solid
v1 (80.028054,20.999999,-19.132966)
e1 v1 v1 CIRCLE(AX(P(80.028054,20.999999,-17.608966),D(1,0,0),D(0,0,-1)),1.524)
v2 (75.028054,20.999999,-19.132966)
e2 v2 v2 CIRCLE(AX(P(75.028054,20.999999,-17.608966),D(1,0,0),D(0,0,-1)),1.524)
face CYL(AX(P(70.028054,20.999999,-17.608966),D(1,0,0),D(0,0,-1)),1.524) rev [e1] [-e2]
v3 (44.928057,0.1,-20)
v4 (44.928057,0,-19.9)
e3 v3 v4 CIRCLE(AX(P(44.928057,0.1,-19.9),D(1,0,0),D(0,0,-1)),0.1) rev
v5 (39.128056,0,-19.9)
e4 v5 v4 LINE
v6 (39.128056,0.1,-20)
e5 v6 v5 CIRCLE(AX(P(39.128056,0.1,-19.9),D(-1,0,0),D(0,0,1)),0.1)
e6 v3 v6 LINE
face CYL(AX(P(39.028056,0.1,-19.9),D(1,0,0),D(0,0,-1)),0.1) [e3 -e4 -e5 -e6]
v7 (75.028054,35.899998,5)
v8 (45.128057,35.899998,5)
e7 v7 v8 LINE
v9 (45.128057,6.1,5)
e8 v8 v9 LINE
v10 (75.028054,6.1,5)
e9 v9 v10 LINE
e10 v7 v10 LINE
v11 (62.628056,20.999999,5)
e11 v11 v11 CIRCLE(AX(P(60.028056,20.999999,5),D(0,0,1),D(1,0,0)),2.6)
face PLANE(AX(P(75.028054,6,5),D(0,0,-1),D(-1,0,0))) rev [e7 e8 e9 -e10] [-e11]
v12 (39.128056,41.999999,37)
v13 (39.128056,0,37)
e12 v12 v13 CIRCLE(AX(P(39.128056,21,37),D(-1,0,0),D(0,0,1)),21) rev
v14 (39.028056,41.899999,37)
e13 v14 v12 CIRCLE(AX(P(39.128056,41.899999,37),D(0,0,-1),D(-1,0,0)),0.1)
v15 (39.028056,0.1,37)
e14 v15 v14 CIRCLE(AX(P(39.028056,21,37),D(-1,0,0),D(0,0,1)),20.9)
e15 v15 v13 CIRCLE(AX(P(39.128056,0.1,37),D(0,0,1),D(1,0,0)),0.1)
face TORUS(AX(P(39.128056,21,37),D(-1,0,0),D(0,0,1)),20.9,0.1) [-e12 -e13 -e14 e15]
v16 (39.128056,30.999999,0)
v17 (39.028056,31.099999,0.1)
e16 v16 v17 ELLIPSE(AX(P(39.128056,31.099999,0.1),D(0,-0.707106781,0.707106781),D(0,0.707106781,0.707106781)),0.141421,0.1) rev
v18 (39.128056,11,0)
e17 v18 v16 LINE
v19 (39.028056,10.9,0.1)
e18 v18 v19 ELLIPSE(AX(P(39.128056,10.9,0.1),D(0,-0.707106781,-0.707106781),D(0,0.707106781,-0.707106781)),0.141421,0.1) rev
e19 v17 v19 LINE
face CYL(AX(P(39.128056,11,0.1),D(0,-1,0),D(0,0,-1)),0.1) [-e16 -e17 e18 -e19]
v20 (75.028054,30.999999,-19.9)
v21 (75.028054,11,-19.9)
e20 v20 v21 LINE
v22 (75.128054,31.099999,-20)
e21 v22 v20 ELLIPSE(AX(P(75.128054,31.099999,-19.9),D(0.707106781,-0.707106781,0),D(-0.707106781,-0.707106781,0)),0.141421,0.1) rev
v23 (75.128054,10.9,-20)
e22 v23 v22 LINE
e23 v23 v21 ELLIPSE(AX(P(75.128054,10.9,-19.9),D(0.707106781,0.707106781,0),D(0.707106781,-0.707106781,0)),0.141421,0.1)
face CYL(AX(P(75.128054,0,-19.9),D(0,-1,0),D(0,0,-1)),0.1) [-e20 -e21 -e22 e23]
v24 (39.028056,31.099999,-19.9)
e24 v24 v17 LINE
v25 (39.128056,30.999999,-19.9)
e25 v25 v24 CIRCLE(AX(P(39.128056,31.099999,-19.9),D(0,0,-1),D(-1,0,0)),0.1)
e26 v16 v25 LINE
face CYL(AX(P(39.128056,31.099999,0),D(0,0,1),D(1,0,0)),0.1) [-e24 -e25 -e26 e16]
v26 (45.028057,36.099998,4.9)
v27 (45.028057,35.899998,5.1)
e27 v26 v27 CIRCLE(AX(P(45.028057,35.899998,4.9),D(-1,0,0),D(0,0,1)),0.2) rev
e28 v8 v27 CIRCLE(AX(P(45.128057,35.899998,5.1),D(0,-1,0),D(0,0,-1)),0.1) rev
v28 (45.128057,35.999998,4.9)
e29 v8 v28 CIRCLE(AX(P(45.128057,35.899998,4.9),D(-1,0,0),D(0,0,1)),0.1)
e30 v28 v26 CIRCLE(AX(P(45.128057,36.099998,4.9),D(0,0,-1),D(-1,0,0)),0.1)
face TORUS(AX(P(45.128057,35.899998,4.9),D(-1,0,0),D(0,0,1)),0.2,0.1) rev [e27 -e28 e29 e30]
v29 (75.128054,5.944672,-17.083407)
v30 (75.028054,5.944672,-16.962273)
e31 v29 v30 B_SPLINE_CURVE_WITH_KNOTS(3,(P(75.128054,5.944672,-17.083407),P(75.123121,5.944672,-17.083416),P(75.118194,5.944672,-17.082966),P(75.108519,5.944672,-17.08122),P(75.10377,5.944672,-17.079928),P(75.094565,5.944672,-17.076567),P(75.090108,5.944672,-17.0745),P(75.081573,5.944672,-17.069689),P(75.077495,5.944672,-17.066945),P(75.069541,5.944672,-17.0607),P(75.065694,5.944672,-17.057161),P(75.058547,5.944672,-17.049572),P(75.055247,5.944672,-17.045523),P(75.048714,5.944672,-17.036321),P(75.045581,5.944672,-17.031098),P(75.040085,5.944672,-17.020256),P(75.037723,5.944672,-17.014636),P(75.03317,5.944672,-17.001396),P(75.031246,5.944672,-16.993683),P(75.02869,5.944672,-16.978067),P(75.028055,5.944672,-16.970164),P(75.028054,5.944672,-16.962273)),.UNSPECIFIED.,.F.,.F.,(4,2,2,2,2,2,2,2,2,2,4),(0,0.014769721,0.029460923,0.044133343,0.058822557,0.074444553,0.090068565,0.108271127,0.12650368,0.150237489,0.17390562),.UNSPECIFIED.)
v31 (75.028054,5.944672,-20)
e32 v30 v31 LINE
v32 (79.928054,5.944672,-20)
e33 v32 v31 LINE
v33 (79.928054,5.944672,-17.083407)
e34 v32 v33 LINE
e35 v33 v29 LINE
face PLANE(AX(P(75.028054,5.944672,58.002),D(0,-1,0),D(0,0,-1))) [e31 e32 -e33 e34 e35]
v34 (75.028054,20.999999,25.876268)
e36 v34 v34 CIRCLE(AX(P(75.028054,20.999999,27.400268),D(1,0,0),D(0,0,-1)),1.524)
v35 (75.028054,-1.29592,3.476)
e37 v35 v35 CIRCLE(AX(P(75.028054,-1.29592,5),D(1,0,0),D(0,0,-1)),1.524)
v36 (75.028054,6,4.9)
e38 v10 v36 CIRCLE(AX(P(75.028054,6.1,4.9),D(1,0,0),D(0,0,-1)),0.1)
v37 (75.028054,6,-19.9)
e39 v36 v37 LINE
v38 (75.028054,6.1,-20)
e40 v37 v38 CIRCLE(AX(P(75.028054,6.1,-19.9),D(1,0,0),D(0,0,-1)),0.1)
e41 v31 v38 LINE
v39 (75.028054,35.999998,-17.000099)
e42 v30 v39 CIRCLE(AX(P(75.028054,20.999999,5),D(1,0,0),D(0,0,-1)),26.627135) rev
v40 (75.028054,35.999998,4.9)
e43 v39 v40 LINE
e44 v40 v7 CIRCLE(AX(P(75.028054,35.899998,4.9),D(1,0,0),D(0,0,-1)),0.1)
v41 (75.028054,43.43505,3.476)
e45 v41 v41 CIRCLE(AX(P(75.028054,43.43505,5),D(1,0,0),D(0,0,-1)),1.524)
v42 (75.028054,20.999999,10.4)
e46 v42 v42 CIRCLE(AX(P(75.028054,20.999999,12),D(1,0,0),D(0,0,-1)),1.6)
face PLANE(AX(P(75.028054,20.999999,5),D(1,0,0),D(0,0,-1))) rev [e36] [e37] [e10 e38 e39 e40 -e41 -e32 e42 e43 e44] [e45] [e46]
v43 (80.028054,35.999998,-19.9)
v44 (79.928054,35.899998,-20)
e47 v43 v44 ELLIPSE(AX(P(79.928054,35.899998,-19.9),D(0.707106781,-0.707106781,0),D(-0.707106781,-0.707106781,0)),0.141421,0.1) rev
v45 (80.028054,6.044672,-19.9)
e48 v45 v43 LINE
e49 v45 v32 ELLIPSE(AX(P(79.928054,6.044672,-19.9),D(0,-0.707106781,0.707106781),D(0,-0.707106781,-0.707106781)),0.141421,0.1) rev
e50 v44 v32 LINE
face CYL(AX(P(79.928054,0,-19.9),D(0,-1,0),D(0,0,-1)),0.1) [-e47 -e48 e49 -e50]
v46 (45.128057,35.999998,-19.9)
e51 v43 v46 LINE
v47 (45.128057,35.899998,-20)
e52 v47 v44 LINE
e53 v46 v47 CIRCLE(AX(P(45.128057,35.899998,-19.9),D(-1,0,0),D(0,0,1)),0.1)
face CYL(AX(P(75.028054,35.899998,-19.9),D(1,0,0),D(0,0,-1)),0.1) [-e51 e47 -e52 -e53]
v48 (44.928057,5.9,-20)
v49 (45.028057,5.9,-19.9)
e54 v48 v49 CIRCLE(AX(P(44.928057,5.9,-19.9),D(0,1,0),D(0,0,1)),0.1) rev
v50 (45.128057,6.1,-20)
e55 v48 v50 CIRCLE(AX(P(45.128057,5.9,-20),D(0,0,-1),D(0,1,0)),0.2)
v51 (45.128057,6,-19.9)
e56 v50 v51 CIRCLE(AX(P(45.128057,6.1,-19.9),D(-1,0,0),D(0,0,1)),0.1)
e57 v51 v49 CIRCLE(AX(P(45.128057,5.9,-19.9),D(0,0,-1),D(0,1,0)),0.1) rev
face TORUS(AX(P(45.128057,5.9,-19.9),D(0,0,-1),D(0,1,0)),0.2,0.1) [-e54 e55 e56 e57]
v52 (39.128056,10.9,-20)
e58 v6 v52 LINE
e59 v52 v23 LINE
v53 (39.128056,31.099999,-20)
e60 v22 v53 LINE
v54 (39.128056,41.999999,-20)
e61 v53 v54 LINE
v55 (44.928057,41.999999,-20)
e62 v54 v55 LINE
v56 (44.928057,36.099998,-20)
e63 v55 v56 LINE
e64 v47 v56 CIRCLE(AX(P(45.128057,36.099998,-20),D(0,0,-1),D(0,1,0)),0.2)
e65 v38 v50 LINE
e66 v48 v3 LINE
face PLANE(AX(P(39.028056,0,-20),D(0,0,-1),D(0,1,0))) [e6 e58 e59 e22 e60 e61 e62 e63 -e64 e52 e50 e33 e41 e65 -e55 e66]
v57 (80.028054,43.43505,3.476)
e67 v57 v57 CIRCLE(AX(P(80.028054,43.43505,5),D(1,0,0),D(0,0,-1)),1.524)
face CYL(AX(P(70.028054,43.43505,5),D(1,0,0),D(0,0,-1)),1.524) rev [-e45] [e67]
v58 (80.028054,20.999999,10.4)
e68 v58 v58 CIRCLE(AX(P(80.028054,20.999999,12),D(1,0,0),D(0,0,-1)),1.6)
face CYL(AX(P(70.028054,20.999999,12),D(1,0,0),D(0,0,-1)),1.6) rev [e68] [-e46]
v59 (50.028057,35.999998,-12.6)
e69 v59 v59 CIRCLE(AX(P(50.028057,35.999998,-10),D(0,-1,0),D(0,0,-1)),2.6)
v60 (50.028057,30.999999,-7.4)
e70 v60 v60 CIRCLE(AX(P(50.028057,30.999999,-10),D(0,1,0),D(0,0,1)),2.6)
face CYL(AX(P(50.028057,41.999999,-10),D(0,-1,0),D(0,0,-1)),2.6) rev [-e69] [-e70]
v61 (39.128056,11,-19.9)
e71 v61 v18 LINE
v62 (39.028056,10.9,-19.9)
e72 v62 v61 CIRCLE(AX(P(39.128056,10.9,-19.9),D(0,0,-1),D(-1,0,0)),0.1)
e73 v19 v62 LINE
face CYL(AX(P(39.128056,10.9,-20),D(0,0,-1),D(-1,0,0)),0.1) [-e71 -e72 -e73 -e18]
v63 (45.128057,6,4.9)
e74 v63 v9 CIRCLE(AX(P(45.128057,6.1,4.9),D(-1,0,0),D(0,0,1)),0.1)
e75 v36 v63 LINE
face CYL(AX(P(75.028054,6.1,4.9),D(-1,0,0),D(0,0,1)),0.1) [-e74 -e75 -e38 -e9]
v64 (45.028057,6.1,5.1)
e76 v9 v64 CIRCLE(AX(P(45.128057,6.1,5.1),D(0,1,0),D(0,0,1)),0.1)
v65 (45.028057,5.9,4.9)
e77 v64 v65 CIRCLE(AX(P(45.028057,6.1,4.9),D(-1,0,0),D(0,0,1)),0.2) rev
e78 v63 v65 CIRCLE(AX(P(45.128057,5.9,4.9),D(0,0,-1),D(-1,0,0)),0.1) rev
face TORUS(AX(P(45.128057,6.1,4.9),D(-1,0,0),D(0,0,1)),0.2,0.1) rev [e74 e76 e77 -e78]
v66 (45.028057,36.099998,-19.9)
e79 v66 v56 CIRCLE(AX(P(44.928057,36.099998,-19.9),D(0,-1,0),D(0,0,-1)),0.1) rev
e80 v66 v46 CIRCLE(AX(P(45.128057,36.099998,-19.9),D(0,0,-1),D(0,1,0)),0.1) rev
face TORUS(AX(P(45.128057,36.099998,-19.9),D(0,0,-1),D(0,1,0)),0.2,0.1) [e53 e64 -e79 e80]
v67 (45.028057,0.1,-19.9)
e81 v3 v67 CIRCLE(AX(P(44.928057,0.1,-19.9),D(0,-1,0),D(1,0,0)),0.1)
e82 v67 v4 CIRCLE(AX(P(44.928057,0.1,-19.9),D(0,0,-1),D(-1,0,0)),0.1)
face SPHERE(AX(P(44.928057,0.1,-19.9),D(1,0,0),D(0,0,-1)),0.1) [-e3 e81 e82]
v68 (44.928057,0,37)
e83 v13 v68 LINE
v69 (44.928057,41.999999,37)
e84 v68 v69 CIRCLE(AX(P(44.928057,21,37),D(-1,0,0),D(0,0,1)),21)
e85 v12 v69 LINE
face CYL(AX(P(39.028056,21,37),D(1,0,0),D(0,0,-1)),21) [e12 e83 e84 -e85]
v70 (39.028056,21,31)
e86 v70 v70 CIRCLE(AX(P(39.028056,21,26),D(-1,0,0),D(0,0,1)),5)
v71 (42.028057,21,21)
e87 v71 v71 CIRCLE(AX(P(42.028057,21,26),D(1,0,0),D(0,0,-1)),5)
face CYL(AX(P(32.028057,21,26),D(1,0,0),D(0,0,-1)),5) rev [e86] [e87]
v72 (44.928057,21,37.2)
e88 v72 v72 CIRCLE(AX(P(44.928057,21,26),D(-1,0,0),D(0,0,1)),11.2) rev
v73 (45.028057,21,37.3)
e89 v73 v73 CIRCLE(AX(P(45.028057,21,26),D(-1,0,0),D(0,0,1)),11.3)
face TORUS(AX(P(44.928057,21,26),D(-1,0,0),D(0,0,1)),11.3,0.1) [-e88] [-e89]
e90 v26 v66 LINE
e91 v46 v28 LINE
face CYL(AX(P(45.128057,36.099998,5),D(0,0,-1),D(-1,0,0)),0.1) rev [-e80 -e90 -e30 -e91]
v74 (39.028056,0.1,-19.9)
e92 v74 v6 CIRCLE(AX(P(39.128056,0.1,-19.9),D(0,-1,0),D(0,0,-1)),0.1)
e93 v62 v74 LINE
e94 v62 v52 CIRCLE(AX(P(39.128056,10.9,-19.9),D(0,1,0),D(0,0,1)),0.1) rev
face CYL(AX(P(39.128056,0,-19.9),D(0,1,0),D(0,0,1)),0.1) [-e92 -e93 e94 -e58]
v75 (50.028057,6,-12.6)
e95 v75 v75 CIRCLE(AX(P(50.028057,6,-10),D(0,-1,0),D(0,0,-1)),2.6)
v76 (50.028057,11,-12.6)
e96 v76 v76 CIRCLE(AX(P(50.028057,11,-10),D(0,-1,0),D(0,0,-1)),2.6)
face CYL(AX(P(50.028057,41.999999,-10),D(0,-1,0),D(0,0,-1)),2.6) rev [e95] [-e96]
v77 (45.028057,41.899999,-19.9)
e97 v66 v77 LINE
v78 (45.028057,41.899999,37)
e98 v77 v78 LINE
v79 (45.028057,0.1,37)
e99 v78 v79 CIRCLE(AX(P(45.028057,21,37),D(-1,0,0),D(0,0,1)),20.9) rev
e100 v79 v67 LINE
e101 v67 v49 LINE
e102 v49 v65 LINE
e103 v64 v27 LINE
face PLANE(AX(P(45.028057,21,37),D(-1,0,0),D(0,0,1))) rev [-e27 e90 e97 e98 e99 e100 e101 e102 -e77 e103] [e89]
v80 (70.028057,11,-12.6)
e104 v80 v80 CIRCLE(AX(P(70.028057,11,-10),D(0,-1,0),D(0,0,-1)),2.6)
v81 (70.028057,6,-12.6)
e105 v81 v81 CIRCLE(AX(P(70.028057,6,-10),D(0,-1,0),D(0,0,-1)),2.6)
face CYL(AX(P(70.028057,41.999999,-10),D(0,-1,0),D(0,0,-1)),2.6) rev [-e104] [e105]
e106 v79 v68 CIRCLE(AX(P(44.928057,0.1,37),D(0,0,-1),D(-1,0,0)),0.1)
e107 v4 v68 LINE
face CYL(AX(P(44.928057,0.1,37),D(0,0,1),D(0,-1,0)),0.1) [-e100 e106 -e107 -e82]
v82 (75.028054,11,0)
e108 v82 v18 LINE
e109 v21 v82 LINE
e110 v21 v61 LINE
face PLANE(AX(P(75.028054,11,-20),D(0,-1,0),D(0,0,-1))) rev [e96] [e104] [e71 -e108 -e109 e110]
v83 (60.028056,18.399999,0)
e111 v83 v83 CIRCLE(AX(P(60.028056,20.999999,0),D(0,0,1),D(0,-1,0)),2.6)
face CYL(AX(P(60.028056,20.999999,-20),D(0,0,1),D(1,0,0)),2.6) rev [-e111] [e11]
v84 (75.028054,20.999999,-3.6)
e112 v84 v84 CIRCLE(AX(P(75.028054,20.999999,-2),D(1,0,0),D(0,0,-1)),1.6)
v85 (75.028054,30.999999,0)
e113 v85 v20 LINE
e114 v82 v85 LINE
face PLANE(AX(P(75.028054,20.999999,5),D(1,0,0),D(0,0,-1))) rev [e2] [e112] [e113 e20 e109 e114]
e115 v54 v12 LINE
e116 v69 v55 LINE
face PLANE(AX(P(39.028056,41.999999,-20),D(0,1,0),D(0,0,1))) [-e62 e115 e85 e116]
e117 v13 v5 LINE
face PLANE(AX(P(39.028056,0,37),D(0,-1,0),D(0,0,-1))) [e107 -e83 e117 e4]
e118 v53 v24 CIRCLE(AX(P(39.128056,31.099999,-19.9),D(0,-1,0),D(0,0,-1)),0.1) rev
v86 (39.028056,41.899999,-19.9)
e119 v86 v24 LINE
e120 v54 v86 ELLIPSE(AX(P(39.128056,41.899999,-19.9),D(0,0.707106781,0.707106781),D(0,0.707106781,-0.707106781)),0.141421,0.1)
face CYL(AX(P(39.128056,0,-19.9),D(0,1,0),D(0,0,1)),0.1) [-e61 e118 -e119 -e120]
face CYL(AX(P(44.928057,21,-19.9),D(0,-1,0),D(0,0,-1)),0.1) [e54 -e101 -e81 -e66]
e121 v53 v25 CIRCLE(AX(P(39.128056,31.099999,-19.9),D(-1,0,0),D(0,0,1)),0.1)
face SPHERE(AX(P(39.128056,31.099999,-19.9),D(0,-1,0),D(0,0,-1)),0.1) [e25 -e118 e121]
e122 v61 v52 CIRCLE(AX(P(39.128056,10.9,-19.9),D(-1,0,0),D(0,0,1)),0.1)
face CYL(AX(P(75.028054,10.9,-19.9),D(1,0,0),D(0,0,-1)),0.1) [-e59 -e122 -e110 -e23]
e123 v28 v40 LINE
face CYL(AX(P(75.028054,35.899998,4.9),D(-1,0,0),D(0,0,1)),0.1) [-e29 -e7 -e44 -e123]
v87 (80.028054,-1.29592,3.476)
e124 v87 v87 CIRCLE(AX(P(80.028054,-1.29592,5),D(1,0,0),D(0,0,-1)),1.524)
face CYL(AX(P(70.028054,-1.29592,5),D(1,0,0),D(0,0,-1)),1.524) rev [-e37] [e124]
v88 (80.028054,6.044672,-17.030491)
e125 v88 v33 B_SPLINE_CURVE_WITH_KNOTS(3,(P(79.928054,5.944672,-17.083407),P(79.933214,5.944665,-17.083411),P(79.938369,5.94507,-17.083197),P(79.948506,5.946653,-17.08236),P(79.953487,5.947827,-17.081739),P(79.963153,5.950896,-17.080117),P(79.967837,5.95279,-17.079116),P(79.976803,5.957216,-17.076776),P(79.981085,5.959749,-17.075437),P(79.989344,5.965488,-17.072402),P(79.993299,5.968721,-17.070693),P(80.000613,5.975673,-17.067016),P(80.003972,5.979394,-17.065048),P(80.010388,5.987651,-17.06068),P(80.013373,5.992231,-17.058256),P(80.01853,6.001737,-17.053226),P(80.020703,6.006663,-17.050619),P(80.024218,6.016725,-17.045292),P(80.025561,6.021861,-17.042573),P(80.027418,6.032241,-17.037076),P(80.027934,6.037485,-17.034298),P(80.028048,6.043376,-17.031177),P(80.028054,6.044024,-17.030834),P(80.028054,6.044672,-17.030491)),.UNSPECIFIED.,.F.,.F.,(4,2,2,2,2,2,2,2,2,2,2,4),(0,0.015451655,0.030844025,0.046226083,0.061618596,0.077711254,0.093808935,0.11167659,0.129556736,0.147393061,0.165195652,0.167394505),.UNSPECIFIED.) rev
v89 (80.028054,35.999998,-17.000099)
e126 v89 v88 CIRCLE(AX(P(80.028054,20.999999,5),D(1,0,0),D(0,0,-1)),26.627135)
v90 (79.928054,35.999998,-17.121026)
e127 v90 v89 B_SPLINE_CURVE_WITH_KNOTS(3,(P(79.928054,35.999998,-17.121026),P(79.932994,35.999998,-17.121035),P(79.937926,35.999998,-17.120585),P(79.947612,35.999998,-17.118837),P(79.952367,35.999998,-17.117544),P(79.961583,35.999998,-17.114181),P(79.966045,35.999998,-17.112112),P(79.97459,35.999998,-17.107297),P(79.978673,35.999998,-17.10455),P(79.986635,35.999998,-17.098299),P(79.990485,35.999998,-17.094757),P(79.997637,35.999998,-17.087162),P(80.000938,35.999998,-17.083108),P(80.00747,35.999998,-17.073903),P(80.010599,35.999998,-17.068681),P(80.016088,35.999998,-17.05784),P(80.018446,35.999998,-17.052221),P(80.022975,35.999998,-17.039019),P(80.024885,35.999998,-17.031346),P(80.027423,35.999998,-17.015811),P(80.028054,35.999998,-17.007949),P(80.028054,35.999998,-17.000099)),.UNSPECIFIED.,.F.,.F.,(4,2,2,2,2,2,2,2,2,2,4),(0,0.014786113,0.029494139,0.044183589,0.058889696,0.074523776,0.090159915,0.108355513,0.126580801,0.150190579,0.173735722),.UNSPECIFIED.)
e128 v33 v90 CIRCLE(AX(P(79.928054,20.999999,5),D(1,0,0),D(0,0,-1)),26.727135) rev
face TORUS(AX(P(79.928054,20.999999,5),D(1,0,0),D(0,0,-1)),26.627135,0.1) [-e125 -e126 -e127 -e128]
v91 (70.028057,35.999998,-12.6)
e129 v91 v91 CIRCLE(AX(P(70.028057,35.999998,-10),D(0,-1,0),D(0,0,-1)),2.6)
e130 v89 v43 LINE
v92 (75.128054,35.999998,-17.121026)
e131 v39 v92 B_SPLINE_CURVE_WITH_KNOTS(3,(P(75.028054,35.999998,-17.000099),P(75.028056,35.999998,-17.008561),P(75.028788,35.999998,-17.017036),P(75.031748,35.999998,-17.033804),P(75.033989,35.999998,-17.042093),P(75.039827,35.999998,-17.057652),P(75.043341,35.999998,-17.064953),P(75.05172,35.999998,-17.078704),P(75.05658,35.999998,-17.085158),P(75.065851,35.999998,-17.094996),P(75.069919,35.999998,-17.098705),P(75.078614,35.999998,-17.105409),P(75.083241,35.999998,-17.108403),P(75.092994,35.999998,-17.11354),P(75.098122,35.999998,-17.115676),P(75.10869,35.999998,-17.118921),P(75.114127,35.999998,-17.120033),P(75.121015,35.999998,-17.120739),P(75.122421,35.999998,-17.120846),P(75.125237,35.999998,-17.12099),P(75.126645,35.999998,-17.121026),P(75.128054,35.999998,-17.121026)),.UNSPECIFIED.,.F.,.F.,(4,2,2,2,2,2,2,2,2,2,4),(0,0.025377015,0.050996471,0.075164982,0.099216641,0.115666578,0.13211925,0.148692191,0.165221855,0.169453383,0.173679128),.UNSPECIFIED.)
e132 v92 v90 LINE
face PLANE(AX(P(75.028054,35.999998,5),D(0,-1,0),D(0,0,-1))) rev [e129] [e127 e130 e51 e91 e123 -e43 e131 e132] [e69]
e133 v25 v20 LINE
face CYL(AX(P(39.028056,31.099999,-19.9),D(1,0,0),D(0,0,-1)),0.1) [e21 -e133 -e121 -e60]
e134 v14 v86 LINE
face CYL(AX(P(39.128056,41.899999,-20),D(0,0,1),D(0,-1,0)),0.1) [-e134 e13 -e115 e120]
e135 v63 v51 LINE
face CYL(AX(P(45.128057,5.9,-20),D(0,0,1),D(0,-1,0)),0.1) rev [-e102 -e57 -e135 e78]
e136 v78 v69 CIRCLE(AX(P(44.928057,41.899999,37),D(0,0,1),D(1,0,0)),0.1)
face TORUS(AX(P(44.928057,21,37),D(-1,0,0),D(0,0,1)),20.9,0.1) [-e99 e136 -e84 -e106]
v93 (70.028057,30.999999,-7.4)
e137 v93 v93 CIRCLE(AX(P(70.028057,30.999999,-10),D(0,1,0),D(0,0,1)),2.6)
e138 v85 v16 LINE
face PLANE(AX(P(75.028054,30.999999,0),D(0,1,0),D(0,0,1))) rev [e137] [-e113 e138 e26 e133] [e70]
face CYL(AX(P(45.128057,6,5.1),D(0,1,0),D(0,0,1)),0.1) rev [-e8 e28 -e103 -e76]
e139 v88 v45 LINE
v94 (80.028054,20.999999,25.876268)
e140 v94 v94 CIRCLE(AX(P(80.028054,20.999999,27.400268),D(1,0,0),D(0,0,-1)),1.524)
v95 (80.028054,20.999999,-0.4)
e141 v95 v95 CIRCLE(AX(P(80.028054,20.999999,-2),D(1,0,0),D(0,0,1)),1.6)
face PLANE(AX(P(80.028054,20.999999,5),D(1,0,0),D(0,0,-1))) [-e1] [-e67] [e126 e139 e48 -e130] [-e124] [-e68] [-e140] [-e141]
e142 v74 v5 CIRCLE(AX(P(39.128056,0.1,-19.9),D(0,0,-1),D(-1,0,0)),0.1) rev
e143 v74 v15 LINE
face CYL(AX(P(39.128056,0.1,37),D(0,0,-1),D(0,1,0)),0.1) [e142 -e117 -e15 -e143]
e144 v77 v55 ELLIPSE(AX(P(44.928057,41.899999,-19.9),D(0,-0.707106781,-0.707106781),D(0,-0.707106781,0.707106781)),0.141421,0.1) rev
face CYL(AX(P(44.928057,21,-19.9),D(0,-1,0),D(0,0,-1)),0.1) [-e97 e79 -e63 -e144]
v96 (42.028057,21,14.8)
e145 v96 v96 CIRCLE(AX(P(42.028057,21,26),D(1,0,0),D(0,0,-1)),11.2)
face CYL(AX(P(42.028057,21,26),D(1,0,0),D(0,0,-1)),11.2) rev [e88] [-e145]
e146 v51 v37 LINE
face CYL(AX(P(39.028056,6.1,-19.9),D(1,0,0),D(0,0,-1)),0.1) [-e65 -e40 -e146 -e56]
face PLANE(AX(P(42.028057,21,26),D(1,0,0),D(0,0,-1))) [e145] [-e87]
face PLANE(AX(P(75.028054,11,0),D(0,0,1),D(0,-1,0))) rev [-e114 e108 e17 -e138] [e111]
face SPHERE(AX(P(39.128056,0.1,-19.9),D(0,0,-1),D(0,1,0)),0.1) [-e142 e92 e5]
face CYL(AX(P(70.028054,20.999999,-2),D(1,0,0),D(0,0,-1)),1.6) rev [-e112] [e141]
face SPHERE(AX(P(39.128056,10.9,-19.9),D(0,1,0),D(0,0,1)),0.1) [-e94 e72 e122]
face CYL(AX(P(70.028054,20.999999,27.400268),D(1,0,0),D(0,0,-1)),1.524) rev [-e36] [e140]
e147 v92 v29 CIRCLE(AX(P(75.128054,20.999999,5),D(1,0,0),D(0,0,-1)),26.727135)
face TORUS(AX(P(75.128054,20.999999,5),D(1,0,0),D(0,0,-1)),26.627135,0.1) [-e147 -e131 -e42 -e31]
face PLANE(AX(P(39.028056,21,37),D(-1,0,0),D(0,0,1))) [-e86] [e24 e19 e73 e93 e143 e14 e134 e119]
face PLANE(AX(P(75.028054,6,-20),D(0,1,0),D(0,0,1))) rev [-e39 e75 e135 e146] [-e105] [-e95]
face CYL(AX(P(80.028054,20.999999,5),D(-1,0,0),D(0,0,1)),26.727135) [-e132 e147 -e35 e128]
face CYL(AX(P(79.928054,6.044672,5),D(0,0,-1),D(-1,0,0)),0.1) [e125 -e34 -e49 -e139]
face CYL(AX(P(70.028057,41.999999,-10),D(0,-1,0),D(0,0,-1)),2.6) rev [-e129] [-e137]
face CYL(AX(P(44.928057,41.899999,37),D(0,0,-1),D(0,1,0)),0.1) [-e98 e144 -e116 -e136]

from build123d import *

# Parameters (mm, degrees)
BOSS_EXTRUDE1_DEPTH = 6.000000983
SKETCH2_W           = 24.999999441
SKETCH2_H           = 29.999998398
BOSS_EXTRUDE2_DEPTH = 29.999997467
SKETCH3_W           = 19.999999553
SKETCH3_H           = 19.999999553
CUT_EXTRUDE1_DEPTH  = 81.149858764
SKETCH14_R          = 11.2
CUT_EXTRUDE12_DEPTH = 3
SKETCH15_R          = 2.6
CUT_EXTRUDE13_DEPTH = 102.435737903
SKETCH19_R          = 2.6
CUT_EXTRUDE15_DEPTH = 102.00598463
SKETCH22_R          = 5
CUT_EXTRUDE16_DEPTH = 10
SKETCH23_R          = 26.727135434
BOSS_EXTRUDE3_DEPTH = 5
CUT_EXTRUDE17_DEPTH = 10
SKETCH25_R          = 1.6
CUT_EXTRUDE18_DEPTH = 10
BOSS_EXTRUDE4_START = -2.916592192
BOSS_EXTRUDE4_DEPTH = 2.916592192
SKETCH27_W          = 3.882504998
SKETCH27_H          = 30.149410972
CUT_EXTRUDE19_DEPTH = 5
FILLET4_R           = 0.1


with BuildPart() as part:
    # Sketch1 → Boss-Extrude1 (new body)
    with BuildSketch(Plane(origin=(45.028056949, 0, 0), x_dir=(0, 0, -1), z_dir=(1, 0, 0))):
        with BuildLine():
            Line((-37.000000447, 0), (19.999999553, 0))
            Line((19.999999553, 0), (19.999999553, 41.999999434))
            Line((19.999999553, 41.999999434), (-37.000000447, 41.999999434))
            ThreePointArc((-37.000000447, 41.999999434), (-58.000000164, 20.999999717), (-37.000000447, 0))
        make_face()
    extrude(amount=-BOSS_EXTRUDE1_DEPTH)

    # Sketch2 → Boss-Extrude2 (add)
    with BuildSketch(Plane(origin=(45.028056949, 0, 0), x_dir=(0, 0, -1), z_dir=(1, 0, 0))):
        with Locations((7.499999833, 20.999999251)):
            Rectangle(SKETCH2_W, SKETCH2_H)
    extrude(amount=BOSS_EXTRUDE2_DEPTH)

    # Sketch3 → Cut-Extrude1 (cut, through all)
    with BuildSketch(Plane.ZY.offset(-39.028055966)):
        with Locations((-9.999999777, 20.999999716)):
            Rectangle(SKETCH3_W, SKETCH3_H)
    extrude(amount=-CUT_EXTRUDE1_DEPTH, mode=Mode.SUBTRACT)

    # Sketch14 → Cut-Extrude12 (cut)
    with BuildSketch(Plane(origin=(45.028056949, 0, 0), x_dir=(0, 0, -1), z_dir=(1, 0, 0))):
        with Locations((-25.999999888, 20.999999717)):
            Circle(SKETCH14_R)
    extrude(amount=-CUT_EXTRUDE12_DEPTH, mode=Mode.SUBTRACT)

    # Sketch15 → Cut-Extrude13 (cut, through all)
    with BuildSketch(Plane(origin=(0, 6.000000052, 0), x_dir=(-1, 0, 0), z_dir=(0, -1, 0))):
        with Locations(Location((-50.028056949, 9.999999553, 0), (0, 0, 90))):
            Circle(SKETCH15_R)
        with Locations(Location((-70.028056949, 9.999999553, 0), (0, 0, 90))):
            Circle(SKETCH15_R)
    extrude(amount=-CUT_EXTRUDE13_DEPTH, mode=Mode.SUBTRACT)

    # Sketch19 → Cut-Extrude15 (cut, through all)
    with BuildSketch(Plane.XY.offset(4.999999888)):
        with Locations((60.028055683, 20.999999251)):
            Circle(SKETCH19_R)
    extrude(amount=-CUT_EXTRUDE15_DEPTH, mode=Mode.SUBTRACT)

    # Sketch22 → Cut-Extrude16 (cut)
    with BuildSketch(Plane(origin=(42.028056949, 0, 0), x_dir=(0, 0, -1), z_dir=(1, 0, 0))):
        with Locations((-25.999999888, 20.999999717)):
            Circle(SKETCH22_R)
    extrude(amount=-CUT_EXTRUDE16_DEPTH, mode=Mode.SUBTRACT)

    # Sketch23 → Boss-Extrude3 (add)
    with BuildSketch(Plane(origin=(75.028054416, 0, 0), x_dir=(0, 0, -1), z_dir=(1, 0, 0))):
        with Locations(Location((-4.999999888, 20.999999251, 0), (0, 0, 325.859280765))):
            Circle(SKETCH23_R)
    extrude(amount=BOSS_EXTRUDE3_DEPTH)

    # Sketch24 → Cut-Extrude17 (cut)
    with BuildSketch(Plane(origin=(80.028054416, 0, 0), x_dir=(0, 0, -1), z_dir=(1, 0, 0))):
        with BuildLine():
            ThreePointArc((-3.957021029, 44.546252652), (-4.999999888, 44.959050105), (-6.042978747, 44.546252652))
            ThreePointArc((-6.042978747, 44.546252652), (-4.999999888, 41.911050105), (-3.957021029, 44.546252652))
        make_face()
        with BuildLine():
            ThreePointArc((-5.860673651, -2.55362244), (-4.999999888, -2.819919504), (-4.139326126, -2.55362244))
            ThreePointArc((-4.139326126, -2.55362244), (-4.999999888, 0.228080496), (-5.860673651, -2.55362244))
        make_face()
        with BuildLine():
            ThreePointArc((18.538374705, 19.79220141), (19.132966089, 20.999999251), (18.538374705, 22.207797092))
            ThreePointArc((18.538374705, 22.207797092), (16.084966089, 20.999999251), (18.538374705, 19.79220141))
        make_face()
        with BuildLine():
            ThreePointArc((-28.548005764, 22.002632473), (-28.924267718, 20.999999251), (-28.548005764, 19.99736603))
            ThreePointArc((-28.548005764, 19.99736603), (-25.876267718, 20.999999251), (-28.548005764, 22.002632473))
        make_face()
    extrude(amount=-CUT_EXTRUDE17_DEPTH, mode=Mode.SUBTRACT)

    # Sketch25 → Cut-Extrude18 (cut)
    with BuildSketch(Plane(origin=(80.028054416, 0, 0), x_dir=(0, 0, -1), z_dir=(1, 0, 0))):
        with Locations((-11.999999888, 20.999999251)):
            Circle(SKETCH25_R)
        with Locations((2.000000112, 20.999999251)):
            Circle(SKETCH25_R)
    extrude(amount=-CUT_EXTRUDE18_DEPTH, mode=Mode.SUBTRACT)

    # Boss-Extrude4: read off the stored shape, not the designer's step
    # Boss-Extrude4 outline → Boss-Extrude4 (add)
    with BuildSketch(Plane(origin=(0, 0, -19.999999553), x_dir=(-1, 0, 0), z_dir=(0, 0, -1)).offset(BOSS_EXTRUDE4_START)):
        Polygon((-75.028054416, 30.451972401), (-75.028054416, 30.999999493), (-39.028055966, 30.999999493), (-39.028055966, 41.999999434), (-45.028056949, 41.999999434), (-45.028056949, 35.99999845), (-80.028054416, 35.99999845), (-80.028054416, 30.451972401), align=None)
        Polygon((-39.028055966, 0), (-39.028055966, 10.99999994), (-75.028054416, 10.99999994), (-75.028054416, 11.548026102), (-80.028054416, 11.548026102), (-80.028054416, 5.944671532), (-75.028054416, 5.944671532), (-75.028054416, 6.000000052), (-45.028056949, 6.000000052), (-45.028056949, 0), align=None)
    extrude(amount=BOSS_EXTRUDE4_DEPTH)

    # Sketch27 → Cut-Extrude19 (cut)
    with BuildSketch(Plane(origin=(80.028054416, 0, 0), x_dir=(0, 0, -1), z_dir=(1, 0, 0))):
        with Locations((21.941252052, 20.925292964)):
            Rectangle(SKETCH27_W, SKETCH27_H)
    extrude(amount=-CUT_EXTRUDE19_DEPTH, mode=Mode.SUBTRACT)

    # Fillet4
    fillet4_edges = [part.edges().sort_by_distance(p)[0] for p in [
        (39.028055966, 0, 8.500000447),
        (42.028056458, 0, -19.999999553),
        (45.028056949, 0, 8.500000447),
        (45.028056949, 20.999999717, 58.000000164),
        (39.028055966, 20.999999717, 58.000000164),
        (39.028055966, 41.999999434, 8.500000447),
        (39.028055966, 5.49999997, -19.999999553),
        (39.028055966, 10.99999994, -9.999999776),
        (39.028055966, 20.999999717, 0),
        (39.028055966, 30.999999493, -9.999999776),
        (39.028055966, 36.499999464, -19.999999553),
        (45.028056949, 3.000000026, -19.999999553),
        (57.028055191, 10.99999994, -19.999999553),
        (75.028054416, 11.274013021, -19.999999553),
        (75.028054416, 20.999999252, -19.999999553),
        (75.028054416, 30.725985947, -19.999999553),
        (57.028055191, 30.999999493, -19.999999553),
        (45.028056949, 38.999998942, -19.999999553),
        (60.028055683, 35.99999845, -19.999999553),
        (77.528054416, 35.99999845, -19.999999553),
        (80.028054416, 33.225985425, -19.999999553),
        (80.028054416, 20.999999252, -19.999999553),
        (80.028054416, 8.746348817, -19.999999553),
        (60.028055683, 6.000000052, -19.999999553),
        (45.028056949, 6.000000052, -7.499999832),
        (45.028056949, 20.999999251, 4.999999888),
        (45.028056949, 35.99999845, -7.499999832),
        (45.028056949, 41.999999434, 8.500000447),
        (45.028056949, 20.999999717, 37.199999888),
        (60.028055683, 6.000000052, 4.999999888),
        (60.028055683, 35.99999845, 4.999999888),
        (75.028054416, 21.033452269, 31.727114386),
        (80.028054416, 5.944671532, -18.541703457),
        (80.028054416, 21.033452269, 31.727114386),
    ]]
    fillet(fillet4_edges, radius=FILLET4_R)


solid = part.part
